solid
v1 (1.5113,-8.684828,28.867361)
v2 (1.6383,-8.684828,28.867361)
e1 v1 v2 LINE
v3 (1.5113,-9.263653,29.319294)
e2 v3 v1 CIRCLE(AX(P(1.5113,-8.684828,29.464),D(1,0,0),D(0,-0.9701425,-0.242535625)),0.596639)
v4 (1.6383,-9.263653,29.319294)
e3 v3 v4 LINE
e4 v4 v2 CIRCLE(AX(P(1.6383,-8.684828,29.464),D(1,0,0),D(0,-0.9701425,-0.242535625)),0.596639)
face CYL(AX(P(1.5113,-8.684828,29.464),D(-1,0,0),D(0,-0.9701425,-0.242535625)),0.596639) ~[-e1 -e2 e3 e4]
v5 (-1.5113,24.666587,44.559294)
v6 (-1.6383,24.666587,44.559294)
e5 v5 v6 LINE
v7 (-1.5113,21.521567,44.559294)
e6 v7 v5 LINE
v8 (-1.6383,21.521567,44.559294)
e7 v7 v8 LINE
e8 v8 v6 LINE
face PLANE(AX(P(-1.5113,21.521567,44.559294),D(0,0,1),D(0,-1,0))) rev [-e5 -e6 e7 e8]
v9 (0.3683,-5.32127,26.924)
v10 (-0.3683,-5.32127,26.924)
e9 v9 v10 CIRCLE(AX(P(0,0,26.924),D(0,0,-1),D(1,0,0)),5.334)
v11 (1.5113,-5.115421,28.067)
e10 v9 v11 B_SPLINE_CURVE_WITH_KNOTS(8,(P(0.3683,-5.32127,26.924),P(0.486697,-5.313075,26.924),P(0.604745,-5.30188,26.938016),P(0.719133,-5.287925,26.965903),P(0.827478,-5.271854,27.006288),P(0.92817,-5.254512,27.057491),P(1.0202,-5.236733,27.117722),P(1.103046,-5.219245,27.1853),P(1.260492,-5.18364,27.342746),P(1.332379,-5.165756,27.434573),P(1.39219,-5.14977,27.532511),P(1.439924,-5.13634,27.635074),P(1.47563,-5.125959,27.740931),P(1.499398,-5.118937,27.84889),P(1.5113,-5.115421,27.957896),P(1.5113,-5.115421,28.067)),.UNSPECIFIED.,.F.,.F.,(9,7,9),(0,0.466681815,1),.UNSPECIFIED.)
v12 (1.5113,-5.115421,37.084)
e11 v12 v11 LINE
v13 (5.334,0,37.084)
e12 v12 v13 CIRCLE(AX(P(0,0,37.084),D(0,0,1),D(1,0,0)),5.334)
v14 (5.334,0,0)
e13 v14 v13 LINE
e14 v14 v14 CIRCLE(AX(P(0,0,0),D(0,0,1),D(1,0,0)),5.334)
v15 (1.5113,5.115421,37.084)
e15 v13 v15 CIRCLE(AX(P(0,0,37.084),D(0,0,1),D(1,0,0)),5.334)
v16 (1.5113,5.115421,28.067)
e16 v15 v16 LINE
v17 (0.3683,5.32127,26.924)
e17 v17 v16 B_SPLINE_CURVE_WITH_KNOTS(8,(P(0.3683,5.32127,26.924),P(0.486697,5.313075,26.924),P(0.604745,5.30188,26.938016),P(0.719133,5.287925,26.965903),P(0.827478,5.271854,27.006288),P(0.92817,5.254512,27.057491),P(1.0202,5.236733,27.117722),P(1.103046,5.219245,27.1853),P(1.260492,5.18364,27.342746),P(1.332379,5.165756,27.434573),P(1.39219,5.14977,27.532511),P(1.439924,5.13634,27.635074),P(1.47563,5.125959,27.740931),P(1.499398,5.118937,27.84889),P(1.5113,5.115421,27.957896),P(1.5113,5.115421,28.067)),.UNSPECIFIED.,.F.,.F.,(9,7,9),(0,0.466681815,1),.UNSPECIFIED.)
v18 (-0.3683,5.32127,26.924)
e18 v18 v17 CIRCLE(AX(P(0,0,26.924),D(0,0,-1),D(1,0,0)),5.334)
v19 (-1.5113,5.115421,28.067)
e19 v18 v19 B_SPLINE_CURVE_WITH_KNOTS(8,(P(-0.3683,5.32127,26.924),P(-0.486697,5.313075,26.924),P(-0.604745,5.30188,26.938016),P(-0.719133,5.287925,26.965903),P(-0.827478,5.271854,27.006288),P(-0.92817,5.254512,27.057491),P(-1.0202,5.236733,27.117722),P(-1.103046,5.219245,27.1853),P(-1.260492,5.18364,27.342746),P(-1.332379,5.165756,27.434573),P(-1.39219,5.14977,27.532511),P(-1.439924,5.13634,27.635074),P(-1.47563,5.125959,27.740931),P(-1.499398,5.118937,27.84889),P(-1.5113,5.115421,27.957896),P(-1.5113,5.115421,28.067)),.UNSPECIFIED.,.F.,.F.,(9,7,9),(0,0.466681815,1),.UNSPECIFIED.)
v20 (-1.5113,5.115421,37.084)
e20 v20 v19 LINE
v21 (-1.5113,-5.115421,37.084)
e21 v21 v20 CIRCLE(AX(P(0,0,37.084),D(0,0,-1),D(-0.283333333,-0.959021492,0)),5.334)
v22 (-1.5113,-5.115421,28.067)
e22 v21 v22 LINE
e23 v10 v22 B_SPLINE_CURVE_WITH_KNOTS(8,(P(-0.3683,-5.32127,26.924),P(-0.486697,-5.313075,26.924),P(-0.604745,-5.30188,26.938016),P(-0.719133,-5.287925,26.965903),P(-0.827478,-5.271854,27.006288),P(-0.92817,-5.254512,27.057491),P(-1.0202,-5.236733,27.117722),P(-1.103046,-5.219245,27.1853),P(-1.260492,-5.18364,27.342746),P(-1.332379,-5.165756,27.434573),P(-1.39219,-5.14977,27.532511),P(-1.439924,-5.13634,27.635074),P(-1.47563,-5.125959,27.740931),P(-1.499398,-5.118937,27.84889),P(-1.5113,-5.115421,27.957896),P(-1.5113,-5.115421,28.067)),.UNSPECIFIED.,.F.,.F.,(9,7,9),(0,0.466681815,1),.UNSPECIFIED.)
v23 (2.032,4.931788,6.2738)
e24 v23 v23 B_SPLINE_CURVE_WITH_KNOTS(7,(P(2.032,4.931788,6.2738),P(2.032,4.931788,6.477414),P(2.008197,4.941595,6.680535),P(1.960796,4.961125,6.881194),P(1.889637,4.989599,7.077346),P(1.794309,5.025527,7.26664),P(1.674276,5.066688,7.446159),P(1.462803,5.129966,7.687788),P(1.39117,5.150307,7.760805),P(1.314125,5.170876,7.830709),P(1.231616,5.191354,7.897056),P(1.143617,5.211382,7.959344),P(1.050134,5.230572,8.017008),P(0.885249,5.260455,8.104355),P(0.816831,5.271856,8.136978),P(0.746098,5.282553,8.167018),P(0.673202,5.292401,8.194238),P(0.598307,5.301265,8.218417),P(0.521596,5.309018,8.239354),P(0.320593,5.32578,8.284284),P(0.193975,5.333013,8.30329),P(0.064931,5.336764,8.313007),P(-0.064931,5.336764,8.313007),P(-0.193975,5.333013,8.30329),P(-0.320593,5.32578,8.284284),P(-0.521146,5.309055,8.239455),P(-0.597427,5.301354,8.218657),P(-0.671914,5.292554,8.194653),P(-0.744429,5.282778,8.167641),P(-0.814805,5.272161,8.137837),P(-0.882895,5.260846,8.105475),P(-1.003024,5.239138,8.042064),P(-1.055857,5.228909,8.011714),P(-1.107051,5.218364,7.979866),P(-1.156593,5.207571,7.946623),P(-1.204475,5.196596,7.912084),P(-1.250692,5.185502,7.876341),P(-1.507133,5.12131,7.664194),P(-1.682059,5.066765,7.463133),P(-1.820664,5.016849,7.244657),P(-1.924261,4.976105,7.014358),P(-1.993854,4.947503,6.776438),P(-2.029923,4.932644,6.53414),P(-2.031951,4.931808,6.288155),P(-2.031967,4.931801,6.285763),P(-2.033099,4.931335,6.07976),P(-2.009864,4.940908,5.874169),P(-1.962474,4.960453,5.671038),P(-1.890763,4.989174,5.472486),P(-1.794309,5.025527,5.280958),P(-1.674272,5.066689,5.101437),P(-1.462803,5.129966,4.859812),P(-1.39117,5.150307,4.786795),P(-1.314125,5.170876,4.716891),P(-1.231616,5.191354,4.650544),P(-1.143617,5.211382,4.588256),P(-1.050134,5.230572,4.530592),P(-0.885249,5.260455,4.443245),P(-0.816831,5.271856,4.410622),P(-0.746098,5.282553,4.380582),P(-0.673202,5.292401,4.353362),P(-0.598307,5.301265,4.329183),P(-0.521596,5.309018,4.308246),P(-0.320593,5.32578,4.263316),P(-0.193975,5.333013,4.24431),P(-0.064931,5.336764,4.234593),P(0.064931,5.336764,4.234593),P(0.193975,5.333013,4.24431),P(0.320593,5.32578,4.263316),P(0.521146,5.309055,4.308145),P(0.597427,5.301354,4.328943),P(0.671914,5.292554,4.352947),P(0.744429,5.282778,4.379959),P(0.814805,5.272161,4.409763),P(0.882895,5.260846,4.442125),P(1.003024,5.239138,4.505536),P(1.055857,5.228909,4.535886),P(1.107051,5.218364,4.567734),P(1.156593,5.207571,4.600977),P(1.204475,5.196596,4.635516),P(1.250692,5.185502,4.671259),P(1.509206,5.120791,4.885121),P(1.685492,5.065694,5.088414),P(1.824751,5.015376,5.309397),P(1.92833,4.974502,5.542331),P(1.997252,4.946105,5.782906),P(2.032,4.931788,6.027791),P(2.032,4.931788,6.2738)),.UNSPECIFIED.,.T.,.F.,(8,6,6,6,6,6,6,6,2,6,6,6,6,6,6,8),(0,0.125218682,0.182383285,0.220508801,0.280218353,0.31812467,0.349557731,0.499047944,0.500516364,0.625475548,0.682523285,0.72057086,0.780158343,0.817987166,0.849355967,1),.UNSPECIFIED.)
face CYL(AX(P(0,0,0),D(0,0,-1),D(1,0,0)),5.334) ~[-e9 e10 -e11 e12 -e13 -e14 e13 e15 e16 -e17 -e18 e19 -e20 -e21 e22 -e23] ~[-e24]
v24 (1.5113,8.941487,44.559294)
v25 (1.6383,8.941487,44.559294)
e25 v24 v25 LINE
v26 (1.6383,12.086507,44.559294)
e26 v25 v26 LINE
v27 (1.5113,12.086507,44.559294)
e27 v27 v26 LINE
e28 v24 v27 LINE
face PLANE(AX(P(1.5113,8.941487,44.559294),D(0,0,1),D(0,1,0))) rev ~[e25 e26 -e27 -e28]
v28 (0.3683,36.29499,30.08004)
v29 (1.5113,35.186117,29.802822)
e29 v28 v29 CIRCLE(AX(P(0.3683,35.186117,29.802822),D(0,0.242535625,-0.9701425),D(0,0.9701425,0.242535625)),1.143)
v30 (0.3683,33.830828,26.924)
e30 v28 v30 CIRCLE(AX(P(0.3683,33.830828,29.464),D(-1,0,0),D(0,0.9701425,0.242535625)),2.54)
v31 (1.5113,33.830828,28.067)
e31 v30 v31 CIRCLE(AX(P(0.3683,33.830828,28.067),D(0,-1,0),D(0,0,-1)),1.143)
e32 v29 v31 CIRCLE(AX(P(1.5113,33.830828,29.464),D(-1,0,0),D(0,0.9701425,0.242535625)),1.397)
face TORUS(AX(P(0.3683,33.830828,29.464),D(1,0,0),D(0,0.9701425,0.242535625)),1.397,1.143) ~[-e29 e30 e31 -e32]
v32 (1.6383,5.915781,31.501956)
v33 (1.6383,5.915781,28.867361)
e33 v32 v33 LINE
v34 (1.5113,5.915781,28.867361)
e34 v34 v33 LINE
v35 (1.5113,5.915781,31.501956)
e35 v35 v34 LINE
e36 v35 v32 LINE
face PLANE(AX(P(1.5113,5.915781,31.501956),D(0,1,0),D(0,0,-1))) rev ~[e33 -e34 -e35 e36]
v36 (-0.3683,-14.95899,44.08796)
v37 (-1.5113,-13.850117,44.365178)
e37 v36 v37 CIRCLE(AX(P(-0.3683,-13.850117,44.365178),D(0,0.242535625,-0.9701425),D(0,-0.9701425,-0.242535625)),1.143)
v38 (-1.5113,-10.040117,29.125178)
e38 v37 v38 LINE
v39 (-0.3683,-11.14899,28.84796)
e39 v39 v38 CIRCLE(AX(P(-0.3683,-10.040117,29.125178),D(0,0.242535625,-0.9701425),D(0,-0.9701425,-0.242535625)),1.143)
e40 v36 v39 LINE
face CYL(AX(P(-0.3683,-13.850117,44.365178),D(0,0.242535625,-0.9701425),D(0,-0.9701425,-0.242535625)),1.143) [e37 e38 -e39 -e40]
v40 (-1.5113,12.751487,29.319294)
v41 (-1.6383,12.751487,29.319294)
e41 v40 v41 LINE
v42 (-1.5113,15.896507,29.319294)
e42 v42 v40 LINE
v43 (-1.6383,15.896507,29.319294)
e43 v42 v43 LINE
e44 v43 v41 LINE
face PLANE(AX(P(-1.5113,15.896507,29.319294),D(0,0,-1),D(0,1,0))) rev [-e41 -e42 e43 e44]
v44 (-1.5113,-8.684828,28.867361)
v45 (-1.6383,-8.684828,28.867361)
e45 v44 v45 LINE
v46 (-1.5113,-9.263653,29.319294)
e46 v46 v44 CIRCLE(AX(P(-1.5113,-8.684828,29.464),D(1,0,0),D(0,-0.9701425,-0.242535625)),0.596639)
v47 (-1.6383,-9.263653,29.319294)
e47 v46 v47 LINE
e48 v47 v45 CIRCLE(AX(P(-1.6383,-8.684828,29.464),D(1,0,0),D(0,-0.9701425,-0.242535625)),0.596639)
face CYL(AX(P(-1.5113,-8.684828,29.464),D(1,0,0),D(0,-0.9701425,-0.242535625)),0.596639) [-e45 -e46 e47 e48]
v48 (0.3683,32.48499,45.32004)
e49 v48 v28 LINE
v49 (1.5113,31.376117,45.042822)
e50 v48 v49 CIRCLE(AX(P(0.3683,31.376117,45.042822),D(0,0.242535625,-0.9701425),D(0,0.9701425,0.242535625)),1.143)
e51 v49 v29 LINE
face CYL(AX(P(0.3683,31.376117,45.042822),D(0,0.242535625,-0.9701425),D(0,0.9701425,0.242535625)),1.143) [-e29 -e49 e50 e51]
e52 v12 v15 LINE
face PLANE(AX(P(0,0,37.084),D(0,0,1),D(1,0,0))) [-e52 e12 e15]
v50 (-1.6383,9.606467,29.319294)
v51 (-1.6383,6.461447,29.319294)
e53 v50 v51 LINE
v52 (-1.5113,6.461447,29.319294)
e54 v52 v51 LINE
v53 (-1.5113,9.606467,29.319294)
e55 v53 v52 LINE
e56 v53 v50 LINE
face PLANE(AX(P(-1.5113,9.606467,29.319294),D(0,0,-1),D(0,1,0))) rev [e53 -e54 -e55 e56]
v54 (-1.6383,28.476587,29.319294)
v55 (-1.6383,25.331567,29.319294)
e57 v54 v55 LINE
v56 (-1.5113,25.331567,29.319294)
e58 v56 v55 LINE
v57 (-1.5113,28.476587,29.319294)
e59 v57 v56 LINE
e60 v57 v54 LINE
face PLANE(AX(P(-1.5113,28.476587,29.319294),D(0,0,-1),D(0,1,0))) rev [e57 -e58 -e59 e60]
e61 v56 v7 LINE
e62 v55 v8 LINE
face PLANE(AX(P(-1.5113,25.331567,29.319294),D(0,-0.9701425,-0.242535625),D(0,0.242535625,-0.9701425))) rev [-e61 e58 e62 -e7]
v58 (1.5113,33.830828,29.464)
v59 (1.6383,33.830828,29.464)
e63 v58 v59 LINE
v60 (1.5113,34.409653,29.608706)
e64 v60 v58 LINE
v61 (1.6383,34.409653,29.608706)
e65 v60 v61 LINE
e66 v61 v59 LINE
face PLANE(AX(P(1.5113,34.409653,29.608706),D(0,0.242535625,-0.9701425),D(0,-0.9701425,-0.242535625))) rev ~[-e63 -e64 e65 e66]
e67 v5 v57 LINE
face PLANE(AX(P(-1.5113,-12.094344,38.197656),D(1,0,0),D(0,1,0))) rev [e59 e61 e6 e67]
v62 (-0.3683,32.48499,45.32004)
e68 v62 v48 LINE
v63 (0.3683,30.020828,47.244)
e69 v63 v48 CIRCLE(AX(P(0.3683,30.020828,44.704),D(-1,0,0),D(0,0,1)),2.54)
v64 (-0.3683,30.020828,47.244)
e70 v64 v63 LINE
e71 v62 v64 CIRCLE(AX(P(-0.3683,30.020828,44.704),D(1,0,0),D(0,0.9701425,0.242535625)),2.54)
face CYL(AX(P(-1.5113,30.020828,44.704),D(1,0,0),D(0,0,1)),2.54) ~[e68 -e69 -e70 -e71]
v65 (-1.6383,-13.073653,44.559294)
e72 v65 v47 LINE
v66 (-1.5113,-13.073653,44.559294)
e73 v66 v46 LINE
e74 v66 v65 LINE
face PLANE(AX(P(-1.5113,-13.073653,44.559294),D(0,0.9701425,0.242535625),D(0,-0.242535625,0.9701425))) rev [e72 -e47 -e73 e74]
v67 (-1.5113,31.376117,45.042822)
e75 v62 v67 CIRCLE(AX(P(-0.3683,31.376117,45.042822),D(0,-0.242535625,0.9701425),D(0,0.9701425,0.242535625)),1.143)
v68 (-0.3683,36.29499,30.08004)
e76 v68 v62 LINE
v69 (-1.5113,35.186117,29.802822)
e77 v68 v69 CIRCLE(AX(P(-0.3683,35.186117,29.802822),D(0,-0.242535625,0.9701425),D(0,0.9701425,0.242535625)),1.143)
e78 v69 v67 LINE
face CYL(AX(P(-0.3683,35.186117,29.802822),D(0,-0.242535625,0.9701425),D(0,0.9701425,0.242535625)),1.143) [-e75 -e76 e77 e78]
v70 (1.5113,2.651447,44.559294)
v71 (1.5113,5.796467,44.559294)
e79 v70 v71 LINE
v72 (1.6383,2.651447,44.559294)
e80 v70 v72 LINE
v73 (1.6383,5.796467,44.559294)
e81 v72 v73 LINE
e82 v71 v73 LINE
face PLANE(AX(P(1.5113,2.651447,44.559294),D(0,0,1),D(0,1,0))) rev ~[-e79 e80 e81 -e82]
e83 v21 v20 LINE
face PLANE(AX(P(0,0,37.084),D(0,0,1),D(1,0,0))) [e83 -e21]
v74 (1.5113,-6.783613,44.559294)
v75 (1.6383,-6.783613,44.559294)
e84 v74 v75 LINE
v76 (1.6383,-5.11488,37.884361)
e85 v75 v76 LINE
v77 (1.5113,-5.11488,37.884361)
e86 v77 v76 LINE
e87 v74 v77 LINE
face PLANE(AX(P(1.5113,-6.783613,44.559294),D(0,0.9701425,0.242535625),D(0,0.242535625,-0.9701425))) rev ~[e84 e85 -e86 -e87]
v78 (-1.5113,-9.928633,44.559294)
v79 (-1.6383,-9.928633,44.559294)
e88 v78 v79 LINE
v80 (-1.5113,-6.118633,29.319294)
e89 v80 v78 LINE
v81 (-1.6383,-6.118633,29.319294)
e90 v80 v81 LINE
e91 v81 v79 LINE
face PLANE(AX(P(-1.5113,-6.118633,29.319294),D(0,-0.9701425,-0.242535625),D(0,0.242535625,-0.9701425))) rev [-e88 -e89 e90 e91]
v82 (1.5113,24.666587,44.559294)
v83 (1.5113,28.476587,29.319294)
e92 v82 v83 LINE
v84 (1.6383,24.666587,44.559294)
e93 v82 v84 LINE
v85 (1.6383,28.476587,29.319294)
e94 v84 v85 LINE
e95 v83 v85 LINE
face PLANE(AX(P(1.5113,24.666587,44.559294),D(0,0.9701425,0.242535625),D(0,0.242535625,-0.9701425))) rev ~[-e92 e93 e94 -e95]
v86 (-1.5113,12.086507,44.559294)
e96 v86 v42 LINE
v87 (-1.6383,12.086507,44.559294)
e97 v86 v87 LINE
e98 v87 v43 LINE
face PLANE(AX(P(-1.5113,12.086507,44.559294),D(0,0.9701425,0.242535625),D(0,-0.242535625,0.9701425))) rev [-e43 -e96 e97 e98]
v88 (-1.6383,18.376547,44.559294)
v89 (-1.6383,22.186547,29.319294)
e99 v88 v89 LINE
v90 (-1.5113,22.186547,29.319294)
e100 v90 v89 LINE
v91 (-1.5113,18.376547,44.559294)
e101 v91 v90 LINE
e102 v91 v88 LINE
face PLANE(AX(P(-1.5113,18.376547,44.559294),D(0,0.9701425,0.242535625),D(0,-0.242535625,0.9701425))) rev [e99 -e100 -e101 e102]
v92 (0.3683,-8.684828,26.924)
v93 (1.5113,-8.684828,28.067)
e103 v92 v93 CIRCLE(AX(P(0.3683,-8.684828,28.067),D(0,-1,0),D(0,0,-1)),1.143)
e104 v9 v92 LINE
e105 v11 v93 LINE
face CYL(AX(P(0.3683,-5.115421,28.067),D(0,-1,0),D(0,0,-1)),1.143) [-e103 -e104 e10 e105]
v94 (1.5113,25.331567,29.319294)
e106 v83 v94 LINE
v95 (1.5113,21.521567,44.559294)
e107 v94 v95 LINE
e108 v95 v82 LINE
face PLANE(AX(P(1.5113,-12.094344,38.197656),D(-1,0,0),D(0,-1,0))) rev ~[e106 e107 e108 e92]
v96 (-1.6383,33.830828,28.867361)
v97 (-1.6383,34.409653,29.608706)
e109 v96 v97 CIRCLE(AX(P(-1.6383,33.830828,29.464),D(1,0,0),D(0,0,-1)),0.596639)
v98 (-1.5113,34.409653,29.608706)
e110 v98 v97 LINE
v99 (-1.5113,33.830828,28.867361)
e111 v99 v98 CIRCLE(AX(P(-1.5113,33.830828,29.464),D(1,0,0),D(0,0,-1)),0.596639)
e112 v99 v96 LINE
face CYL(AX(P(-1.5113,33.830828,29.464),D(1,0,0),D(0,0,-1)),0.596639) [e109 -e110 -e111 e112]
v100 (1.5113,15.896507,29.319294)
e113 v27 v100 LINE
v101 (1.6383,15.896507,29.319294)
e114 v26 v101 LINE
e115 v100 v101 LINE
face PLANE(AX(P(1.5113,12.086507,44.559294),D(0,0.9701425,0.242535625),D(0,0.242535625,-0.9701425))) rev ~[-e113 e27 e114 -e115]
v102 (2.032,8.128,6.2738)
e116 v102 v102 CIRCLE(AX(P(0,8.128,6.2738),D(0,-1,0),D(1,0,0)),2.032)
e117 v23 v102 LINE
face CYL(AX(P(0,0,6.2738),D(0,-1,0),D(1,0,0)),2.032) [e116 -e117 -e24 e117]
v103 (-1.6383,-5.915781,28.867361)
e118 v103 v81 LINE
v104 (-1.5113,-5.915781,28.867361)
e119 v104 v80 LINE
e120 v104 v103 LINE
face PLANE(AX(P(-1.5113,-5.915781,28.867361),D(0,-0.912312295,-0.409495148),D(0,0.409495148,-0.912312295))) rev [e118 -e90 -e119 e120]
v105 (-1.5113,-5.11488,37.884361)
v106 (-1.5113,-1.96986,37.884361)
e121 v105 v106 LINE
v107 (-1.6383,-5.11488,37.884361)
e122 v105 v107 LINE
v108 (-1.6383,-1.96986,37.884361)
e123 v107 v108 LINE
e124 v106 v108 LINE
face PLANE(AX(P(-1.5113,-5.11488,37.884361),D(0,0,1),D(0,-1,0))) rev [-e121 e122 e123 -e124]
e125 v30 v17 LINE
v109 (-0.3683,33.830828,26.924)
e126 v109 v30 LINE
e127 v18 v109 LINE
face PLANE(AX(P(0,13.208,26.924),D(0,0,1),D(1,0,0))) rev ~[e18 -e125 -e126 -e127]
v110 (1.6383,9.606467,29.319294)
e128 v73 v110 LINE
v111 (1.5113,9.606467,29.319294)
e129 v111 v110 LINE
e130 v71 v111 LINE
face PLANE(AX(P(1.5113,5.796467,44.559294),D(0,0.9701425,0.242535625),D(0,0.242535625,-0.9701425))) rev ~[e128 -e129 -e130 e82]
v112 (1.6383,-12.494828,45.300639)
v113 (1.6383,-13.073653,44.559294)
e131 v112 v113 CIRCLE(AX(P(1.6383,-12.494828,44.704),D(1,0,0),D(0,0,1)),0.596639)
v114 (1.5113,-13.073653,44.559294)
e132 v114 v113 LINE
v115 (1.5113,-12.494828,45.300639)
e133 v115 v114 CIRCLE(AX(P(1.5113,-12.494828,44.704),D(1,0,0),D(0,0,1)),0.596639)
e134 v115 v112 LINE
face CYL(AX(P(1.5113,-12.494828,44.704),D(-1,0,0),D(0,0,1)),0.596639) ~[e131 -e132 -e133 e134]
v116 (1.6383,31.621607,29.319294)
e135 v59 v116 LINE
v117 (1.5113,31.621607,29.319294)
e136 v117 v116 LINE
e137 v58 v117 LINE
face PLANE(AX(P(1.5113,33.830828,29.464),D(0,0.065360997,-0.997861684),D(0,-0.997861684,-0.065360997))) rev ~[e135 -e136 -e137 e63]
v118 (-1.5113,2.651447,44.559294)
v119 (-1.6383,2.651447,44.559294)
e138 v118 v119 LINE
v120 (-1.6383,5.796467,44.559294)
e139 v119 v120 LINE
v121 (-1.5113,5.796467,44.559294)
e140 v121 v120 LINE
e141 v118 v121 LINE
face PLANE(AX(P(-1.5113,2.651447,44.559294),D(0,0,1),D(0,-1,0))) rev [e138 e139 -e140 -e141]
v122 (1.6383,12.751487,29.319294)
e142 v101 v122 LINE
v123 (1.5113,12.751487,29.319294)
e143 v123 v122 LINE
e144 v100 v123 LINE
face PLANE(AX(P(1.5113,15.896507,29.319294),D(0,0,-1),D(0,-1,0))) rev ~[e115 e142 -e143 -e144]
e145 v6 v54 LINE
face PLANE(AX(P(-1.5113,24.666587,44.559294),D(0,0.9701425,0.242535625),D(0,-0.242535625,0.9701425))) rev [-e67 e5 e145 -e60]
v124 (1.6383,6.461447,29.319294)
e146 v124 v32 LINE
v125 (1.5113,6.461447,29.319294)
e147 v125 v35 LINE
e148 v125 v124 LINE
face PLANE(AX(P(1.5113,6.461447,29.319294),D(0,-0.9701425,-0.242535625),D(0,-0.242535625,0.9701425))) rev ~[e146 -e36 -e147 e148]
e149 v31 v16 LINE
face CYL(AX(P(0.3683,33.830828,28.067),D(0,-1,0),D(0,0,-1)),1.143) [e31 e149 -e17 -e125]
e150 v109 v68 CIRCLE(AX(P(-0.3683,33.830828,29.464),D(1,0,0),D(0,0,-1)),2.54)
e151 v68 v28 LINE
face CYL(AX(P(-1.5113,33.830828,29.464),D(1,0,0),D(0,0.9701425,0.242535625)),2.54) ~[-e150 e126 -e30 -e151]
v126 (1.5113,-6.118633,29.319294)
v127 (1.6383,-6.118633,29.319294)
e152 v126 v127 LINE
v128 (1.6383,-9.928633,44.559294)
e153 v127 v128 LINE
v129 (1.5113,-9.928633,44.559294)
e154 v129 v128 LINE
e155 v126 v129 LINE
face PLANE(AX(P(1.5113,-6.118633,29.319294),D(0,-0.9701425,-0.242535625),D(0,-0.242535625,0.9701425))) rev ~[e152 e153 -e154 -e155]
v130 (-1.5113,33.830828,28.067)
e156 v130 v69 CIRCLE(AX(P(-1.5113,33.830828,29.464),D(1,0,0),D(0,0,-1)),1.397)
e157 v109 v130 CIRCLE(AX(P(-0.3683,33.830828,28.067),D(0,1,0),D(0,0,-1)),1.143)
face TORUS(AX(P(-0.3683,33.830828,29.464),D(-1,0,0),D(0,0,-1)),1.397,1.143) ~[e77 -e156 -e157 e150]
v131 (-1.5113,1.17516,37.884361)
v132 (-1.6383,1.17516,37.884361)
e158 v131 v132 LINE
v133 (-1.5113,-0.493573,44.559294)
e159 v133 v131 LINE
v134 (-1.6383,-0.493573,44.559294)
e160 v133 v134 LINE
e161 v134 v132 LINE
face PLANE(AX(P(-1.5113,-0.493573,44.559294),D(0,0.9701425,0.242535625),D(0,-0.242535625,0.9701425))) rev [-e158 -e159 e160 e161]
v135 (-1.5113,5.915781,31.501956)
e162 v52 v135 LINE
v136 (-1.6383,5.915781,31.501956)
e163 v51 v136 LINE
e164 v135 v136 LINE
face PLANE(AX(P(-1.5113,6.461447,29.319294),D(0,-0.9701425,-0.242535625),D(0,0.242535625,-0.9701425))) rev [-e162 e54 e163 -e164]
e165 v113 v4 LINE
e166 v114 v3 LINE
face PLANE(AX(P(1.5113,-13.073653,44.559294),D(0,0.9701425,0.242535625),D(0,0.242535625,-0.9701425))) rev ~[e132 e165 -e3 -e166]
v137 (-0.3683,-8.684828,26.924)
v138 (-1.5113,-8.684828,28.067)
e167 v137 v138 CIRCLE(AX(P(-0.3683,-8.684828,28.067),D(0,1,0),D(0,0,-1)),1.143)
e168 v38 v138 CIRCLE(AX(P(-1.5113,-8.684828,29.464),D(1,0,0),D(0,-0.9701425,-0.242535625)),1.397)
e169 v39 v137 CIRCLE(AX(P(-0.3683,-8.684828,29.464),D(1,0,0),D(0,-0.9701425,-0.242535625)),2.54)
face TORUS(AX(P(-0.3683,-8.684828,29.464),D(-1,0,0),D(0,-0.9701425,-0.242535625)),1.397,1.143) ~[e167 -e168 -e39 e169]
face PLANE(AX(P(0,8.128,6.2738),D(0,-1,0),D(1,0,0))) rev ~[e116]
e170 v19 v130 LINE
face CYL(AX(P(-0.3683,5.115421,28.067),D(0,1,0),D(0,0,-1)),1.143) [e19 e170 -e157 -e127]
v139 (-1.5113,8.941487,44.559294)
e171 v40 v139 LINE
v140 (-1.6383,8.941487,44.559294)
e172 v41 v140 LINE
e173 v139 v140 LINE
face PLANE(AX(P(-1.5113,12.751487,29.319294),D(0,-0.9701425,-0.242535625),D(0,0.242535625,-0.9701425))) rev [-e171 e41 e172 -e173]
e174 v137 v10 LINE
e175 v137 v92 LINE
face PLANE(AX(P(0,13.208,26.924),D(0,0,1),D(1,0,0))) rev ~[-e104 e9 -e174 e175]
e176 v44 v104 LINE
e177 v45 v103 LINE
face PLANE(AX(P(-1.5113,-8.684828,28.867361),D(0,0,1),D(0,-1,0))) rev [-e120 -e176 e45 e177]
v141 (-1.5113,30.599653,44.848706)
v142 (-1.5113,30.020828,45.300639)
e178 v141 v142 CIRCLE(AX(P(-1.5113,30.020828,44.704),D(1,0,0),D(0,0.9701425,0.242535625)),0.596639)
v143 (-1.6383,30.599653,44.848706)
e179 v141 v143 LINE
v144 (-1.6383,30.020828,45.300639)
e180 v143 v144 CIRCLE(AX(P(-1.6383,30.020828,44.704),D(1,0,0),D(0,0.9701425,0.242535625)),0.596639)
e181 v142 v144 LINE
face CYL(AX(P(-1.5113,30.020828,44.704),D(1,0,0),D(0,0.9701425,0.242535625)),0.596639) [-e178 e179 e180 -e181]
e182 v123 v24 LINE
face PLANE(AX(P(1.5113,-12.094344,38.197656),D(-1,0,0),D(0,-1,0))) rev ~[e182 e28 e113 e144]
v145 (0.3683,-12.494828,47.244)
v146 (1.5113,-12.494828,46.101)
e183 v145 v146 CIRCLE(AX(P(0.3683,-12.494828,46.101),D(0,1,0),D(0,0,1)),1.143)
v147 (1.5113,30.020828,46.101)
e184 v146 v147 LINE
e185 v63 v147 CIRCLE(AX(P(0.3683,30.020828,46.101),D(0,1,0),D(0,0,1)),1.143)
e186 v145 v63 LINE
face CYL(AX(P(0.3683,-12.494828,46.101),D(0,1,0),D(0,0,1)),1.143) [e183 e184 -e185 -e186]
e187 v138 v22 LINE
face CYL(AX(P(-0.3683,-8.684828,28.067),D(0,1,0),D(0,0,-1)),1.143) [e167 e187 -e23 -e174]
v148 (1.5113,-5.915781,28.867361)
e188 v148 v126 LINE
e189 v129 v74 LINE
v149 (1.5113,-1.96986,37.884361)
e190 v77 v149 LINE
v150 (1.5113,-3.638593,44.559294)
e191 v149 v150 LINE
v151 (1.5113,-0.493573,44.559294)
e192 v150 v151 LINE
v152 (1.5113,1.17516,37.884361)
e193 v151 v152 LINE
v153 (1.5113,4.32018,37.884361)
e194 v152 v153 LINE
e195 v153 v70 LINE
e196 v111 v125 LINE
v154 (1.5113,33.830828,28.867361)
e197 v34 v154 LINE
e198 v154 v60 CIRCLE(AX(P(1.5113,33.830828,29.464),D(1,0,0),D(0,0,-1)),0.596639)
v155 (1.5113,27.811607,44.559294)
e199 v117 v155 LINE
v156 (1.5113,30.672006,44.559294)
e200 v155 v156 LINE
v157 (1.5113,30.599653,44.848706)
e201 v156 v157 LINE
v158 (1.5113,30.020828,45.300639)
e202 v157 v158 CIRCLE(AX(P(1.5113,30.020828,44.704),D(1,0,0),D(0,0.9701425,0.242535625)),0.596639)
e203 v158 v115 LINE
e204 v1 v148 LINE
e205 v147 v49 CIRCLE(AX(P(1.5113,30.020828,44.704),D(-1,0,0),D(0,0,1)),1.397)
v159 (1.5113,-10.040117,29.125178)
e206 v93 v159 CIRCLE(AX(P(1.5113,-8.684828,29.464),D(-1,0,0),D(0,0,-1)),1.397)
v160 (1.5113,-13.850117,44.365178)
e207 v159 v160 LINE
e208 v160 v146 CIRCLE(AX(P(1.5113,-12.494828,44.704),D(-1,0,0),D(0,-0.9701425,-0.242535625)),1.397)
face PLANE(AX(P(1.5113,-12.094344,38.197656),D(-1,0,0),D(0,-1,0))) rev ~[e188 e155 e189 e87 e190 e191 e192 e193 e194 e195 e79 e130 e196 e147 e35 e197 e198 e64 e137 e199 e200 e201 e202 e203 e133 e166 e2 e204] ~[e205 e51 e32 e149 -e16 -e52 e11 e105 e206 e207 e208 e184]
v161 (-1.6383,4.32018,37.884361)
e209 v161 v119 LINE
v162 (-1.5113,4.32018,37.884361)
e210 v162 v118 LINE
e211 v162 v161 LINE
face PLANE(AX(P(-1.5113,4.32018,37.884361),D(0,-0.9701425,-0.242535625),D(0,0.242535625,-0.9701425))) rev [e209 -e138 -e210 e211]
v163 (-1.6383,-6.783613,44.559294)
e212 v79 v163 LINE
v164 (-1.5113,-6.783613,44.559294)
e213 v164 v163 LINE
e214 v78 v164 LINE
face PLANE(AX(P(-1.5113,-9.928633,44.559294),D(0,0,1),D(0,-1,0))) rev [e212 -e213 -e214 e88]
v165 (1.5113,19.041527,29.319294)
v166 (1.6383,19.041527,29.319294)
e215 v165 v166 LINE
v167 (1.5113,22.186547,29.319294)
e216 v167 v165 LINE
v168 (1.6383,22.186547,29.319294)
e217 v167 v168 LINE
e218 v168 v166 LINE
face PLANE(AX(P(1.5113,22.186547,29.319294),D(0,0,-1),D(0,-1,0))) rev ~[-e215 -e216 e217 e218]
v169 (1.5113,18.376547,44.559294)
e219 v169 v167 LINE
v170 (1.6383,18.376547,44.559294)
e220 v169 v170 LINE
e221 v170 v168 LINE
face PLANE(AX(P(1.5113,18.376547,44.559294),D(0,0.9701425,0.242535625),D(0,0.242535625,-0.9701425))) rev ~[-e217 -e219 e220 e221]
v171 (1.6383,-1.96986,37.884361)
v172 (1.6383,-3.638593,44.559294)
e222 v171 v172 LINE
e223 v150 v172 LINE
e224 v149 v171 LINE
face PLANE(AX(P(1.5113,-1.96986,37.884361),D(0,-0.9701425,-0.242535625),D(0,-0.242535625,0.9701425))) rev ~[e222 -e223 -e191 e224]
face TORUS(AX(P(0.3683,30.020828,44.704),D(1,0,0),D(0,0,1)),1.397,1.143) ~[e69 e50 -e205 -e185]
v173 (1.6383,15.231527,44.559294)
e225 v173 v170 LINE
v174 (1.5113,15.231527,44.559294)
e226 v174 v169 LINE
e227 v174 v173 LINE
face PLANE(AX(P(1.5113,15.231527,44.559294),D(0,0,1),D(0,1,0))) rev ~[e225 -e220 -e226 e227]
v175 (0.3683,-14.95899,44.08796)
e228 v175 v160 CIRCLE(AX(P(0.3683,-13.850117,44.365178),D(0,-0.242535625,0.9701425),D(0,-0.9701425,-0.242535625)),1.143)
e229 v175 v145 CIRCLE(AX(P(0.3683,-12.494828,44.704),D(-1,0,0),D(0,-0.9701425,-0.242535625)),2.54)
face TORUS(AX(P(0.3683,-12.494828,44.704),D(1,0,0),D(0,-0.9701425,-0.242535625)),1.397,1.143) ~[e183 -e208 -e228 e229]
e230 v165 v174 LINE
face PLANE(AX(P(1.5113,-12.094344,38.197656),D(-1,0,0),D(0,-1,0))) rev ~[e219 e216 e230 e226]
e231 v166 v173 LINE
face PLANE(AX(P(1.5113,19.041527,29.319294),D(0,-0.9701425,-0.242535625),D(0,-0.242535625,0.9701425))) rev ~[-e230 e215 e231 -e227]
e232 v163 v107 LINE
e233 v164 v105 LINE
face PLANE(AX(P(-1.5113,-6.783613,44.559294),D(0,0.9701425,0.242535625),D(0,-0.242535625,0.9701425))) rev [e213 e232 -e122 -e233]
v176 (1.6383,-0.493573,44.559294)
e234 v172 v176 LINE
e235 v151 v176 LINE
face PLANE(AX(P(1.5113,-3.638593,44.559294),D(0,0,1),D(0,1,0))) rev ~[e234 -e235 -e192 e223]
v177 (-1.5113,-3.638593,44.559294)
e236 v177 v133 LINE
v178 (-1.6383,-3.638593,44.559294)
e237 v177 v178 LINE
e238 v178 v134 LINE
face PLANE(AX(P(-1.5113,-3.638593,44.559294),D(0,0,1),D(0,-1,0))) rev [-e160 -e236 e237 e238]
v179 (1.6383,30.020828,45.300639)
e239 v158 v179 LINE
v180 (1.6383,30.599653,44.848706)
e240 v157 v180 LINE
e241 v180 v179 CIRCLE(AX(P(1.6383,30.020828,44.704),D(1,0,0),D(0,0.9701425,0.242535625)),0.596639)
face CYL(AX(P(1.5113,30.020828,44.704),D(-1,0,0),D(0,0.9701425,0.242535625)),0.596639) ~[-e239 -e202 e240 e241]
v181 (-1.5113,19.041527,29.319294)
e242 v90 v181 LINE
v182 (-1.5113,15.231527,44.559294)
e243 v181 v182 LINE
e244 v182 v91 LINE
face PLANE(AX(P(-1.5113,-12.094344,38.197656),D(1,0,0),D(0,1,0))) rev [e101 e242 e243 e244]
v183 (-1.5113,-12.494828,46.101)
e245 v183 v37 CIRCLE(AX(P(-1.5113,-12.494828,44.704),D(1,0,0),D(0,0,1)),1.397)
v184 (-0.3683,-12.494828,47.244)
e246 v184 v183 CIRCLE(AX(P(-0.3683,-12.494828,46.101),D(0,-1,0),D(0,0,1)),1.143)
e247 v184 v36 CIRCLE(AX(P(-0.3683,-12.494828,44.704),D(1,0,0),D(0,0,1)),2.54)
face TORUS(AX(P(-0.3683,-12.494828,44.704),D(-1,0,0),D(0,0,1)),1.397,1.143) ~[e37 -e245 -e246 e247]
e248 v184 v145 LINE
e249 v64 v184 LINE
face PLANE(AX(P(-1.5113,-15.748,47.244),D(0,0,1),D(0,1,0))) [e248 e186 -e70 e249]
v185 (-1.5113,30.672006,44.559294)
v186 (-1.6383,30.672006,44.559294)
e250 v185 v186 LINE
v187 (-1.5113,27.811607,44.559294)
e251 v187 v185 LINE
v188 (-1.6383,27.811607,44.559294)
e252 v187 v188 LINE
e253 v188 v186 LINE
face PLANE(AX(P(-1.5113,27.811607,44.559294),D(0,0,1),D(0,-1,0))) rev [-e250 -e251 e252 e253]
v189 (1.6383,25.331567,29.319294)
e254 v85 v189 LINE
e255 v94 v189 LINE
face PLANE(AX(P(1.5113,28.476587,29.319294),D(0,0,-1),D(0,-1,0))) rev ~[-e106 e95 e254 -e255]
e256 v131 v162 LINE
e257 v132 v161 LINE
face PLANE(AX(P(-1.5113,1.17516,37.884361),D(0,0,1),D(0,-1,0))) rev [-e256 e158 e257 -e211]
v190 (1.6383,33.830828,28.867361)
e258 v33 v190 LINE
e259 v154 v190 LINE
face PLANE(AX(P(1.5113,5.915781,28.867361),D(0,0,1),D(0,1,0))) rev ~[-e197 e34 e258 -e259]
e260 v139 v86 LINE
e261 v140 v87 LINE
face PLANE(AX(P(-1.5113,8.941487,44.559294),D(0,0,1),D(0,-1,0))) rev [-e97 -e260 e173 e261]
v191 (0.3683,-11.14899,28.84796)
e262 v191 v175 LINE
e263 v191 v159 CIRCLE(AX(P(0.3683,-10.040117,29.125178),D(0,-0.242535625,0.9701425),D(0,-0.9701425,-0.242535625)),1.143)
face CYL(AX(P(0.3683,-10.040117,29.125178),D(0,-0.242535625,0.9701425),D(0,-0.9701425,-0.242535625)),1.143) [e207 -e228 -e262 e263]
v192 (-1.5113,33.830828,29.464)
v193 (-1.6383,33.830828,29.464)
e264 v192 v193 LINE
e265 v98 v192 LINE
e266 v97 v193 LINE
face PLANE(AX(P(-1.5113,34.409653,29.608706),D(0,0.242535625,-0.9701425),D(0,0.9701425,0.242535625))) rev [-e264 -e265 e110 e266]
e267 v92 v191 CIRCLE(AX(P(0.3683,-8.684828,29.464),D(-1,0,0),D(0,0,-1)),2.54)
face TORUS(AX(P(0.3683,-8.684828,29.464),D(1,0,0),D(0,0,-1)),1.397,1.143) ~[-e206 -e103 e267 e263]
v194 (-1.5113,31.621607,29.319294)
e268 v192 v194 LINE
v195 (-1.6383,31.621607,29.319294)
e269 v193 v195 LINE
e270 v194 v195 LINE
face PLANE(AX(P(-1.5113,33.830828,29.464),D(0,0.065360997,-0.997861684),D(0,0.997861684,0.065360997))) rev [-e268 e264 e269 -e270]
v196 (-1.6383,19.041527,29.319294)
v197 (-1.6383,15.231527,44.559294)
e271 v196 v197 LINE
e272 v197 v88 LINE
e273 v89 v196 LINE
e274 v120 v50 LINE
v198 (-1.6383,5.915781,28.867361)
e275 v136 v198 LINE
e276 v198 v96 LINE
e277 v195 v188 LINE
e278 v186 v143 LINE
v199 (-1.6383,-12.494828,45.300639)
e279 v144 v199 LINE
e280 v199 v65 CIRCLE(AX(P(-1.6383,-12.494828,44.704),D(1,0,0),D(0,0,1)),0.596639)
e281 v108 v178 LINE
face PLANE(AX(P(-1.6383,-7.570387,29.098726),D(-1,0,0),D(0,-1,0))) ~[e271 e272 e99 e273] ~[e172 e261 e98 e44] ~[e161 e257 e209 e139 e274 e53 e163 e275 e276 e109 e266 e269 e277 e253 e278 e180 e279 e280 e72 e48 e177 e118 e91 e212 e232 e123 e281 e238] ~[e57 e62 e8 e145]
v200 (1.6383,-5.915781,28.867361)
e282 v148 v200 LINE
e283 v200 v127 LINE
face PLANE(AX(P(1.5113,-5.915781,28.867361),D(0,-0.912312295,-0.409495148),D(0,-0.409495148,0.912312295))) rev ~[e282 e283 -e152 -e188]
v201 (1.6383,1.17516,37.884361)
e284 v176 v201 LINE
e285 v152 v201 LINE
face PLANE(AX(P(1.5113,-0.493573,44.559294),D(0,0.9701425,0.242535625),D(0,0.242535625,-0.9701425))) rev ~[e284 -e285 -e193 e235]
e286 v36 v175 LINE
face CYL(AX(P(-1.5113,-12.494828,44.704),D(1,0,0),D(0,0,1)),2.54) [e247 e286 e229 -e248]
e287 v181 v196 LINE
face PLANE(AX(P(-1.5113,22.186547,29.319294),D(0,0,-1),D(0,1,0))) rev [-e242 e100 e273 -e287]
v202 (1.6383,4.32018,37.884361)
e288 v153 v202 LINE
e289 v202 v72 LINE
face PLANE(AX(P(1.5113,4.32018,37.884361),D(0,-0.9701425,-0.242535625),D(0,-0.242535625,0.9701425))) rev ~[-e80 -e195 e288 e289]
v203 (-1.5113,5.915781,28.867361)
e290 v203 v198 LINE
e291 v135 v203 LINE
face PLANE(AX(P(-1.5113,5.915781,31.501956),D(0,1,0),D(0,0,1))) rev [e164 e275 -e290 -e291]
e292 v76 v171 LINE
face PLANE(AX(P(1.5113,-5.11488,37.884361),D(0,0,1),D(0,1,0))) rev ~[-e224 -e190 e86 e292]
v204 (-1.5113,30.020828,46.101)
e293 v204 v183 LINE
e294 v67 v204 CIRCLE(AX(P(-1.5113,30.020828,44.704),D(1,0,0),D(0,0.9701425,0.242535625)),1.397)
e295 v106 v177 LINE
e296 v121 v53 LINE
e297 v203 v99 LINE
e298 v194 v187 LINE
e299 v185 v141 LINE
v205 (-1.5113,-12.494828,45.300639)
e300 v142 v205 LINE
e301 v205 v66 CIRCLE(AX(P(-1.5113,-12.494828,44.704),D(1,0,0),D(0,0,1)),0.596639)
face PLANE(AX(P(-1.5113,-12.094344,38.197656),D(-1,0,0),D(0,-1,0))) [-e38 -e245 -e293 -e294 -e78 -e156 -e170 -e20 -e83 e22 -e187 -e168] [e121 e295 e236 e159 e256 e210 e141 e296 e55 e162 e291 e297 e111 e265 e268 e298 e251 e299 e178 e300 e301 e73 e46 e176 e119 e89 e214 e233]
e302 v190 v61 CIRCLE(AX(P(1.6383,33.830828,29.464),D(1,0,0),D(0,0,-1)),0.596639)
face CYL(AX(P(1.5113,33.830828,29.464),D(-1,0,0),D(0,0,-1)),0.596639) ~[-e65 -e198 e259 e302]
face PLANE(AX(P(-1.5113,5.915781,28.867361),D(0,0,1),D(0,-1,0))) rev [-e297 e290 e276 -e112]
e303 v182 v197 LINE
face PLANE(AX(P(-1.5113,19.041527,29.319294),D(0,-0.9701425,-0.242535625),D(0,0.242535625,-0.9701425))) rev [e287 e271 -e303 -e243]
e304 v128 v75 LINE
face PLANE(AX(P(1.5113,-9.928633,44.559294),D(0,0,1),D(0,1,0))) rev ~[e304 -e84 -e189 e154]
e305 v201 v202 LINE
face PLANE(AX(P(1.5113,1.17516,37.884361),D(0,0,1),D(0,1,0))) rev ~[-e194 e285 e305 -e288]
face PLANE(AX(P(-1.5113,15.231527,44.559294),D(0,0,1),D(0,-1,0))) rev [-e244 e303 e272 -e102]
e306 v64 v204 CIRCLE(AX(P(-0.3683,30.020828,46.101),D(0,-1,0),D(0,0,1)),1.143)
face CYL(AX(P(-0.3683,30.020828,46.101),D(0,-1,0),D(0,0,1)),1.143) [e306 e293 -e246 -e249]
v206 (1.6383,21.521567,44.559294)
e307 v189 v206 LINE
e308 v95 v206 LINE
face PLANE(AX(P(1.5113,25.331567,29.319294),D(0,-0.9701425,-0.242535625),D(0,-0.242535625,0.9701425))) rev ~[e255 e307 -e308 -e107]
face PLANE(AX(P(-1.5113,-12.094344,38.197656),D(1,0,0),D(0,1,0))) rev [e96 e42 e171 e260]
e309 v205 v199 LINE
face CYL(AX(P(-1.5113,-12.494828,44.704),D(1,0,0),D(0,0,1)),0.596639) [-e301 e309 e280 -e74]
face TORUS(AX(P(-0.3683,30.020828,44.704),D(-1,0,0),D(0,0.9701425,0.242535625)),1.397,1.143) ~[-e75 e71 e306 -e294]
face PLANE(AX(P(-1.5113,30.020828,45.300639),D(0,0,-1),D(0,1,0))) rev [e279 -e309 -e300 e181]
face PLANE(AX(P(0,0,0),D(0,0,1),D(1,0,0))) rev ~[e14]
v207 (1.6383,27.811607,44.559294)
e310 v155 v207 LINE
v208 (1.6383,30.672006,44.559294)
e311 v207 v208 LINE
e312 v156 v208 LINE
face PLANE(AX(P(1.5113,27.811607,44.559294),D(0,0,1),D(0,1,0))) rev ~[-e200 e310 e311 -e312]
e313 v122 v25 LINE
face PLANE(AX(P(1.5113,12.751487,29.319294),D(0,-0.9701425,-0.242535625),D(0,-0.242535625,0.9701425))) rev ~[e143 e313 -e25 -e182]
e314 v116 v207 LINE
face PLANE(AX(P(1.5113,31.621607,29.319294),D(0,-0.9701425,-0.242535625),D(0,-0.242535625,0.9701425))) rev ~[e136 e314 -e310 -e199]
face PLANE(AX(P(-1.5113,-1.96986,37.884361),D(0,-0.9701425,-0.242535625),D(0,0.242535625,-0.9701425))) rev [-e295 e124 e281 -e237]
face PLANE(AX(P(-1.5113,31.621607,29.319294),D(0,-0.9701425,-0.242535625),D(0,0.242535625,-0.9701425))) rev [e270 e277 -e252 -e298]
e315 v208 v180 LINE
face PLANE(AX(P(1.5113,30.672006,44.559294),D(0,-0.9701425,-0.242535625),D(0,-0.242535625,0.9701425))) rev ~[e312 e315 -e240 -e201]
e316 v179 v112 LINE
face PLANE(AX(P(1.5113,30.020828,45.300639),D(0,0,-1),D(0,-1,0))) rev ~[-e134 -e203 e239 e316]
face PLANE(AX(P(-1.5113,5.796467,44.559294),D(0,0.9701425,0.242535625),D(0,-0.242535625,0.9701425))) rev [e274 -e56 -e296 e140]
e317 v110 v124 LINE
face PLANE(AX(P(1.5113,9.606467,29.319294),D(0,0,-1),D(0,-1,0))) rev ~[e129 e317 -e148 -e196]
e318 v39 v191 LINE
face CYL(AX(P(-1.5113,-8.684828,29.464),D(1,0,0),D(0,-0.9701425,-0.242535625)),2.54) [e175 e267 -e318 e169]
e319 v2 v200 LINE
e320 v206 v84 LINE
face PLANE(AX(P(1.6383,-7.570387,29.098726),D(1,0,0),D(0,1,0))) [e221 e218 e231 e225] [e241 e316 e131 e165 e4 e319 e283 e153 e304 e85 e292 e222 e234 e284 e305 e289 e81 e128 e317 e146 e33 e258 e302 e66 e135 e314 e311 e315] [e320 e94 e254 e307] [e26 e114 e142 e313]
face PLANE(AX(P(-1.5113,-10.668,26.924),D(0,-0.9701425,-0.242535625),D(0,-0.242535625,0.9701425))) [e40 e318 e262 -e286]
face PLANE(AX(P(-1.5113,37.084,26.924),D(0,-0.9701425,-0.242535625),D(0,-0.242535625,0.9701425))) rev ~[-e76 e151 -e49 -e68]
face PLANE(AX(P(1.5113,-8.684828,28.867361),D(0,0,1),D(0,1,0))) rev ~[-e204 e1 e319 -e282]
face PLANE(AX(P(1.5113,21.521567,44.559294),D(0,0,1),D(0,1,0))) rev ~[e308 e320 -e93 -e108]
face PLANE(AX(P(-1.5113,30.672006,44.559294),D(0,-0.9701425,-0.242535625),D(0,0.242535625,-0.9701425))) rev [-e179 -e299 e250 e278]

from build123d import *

# Parameters (mm, degrees)
F0_R      = 5.334
F1_DEPTH  = 37.084
F2_R      = 2.032
F3_DEPTH  = 8.128
F4_W      = 3.0226
F4_H      = 47.752
F5_DEPTH  = 10.16
F7_DEPTH  = 3.0226
F9_DEPTH  = 3.0226
F10_R     = 2.54
F11_R     = 1.143
F13_DEPTH = 0.127


# Not quite as in the source:
# - a feature of the source that left no trace in its solid (it failed there, or was rolled back) is left out


with BuildPart() as f1:
    # F0 (on Top) → F1 (new body)
    with BuildSketch(Plane.XY):
        Circle(F0_R)
    extrude(amount=F1_DEPTH)

    # F2 (on Front) → F3 (join)
    with BuildSketch(Plane.XZ):
        with Locations((0, 6.2738)):
            Circle(F2_R)
    extrude(amount=-F3_DEPTH)

    # F4 (on face) → F5 (join, symmetric)
    with BuildSketch(Plane.XY.offset(37.084)):
        with Locations((0, 13.208)):
            Rectangle(F4_W, F4_H)
    extrude(amount=F5_DEPTH, both=True)

    # F6 (on face) → F7 (join)
    with BuildSketch(Plane(origin=(-1.5113, 0, 0), x_dir=(0, -1, 0), z_dir=(-1, 0, 0))):
        Polygon((15.748, 47.244), (10.668, 47.244), (10.668, 26.924), align=None)
        Polygon((-37.084, 47.244), (-37.084, 26.924), (-32.004, 47.244), align=None)
    extrude(amount=-F7_DEPTH)

    # F8 (on face) → F9 (cut, through all)
    with BuildSketch(Plane(origin=(-1.5113, 0, 0), x_dir=(0, -1, 0), z_dir=(-1, 0, 0))):
        Polygon((-37.084, 47.244), (-37.084, 26.924), (-32.004, 47.244), align=None)
    extrude(amount=-F9_DEPTH, mode=Mode.SUBTRACT)

    # F10
    f10_edges = [f1.edges().sort_by_distance(p)[0] for p in [
        (0, 32.004, 47.244),
        (0, 37.084, 26.924),
        (0, -15.748, 47.244),
        (0, -10.668, 26.924),
    ]]
    fillet(f10_edges, radius=F10_R)

    # F11
    f11_edges = [f1.edges().sort_by_distance(p)[0] for p in [
        (-1.5113, 8.763, 47.244),
        (1.5113, 8.763, 47.244),
        (-1.5113, 34.38999, 37.70004),
        (1.5113, 34.38999, 37.70004),
        (1.5113, 31.583975, 46.706042),
        (-1.5113, 31.583975, 46.706042),
        (-1.5113, 35.83287, 27.900853),
        (1.5113, 35.83287, 27.900853),
        (1.5113, 19.473124, 26.924),
        (-1.5113, 19.473124, 26.924),
        (1.5113, -14.49687, 46.267147),
        (1.5113, -13.05399, 36.46796),
        (-1.5113, -14.49687, 46.267147),
        (-1.5113, -13.05399, 36.46796),
        (1.5113, -10.247975, 27.461958),
        (1.5113, -6.900124, 26.924),
        (-1.5113, -6.900124, 26.924),
        (-1.5113, -10.247975, 27.461958),
    ]]
    fillet(f11_edges, radius=F11_R)

    # F12 (on face) → F13 (join)
    with BuildSketch(Plane.YZ.offset(1.5113)):
        with BuildLine():
            Line((-6.1186332318, 29.319293674), (-9.2636532318, 29.319293674))
            ThreePointArc((-9.2636532318, 29.319293674), (-9.0520071402, 28.9937255277), (-8.6848279277, 28.8673605332))
            Line((-8.6848279277, 28.8673605332), (-5.9157811718, 28.8673605332))
            Line((-5.9157811718, 28.8673605332), (-6.1186332318, 29.319293674))
        make_face()
        Polygon((-9.9286332318, 44.559293674), (-13.0736532318, 44.559293674), (-9.2636532318, 29.319293674), (-6.1186332318, 29.319293674), align=None)
        Polygon((-3.6385932318, 44.559293674), (-6.7836132318, 44.559293674), (-5.1148799466, 37.8843605332), (-1.9698599466, 37.8843605332), align=None)
        Polygon((2.6514467682, 44.559293674), (-0.4935732318, 44.559293674), (1.1751600534, 37.8843605332), (4.3201800534, 37.8843605332), align=None)
        with BuildLine():
            ThreePointArc((33.8308279277, 28.8673605332), (34.3011024, 29.0968207875), (34.4096532318, 29.608706326))
            Line((34.4096532318, 29.608706326), (33.8308279277, 29.464))
            Line((33.8308279277, 29.464), (31.6216067682, 29.319293674))
            Line((31.6216067682, 29.319293674), (28.4765867682, 29.319293674))
            Line((28.4765867682, 29.319293674), (25.3315667682, 29.319293674))
            Line((25.3315667682, 29.319293674), (22.1865467682, 29.319293674))
            Line((22.1865467682, 29.319293674), (19.0415267682, 29.319293674))
            Line((19.0415267682, 29.319293674), (15.8965067682, 29.319293674))
            Line((15.8965067682, 29.319293674), (12.7514867682, 29.319293674))
            Line((12.7514867682, 29.319293674), (9.6064667682, 29.319293674))
            Line((9.6064667682, 29.319293674), (6.4614467682, 29.319293674))
            Line((6.4614467682, 29.319293674), (5.9157811718, 31.5019560598))
            Line((5.9157811718, 31.5019560598), (5.9157811718, 28.8673605332))
            Line((5.9157811718, 28.8673605332), (33.8308279277, 28.8673605332))
        make_face()
        with BuildLine():
            ThreePointArc((-12.4948279277, 45.3006394668), (-12.9651024, 45.0711792125), (-13.0736532318, 44.559293674))
            Line((-13.0736532318, 44.559293674), (-9.9286332318, 44.559293674))
            Line((-9.9286332318, 44.559293674), (-6.7836132318, 44.559293674))
            Line((-6.7836132318, 44.559293674), (-3.6385932318, 44.559293674))
            Line((-3.6385932318, 44.559293674), (-0.4935732318, 44.559293674))
            Line((-0.4935732318, 44.559293674), (2.6514467682, 44.559293674))
            Line((2.6514467682, 44.559293674), (5.7964667682, 44.559293674))
            Line((5.7964667682, 44.559293674), (8.9414867682, 44.559293674))
            Line((8.9414867682, 44.559293674), (12.0865067682, 44.559293674))
            Line((12.0865067682, 44.559293674), (15.2315267682, 44.559293674))
            Line((15.2315267682, 44.559293674), (18.3765467682, 44.559293674))
            Line((18.3765467682, 44.559293674), (21.5215667682, 44.559293674))
            Line((21.5215667682, 44.559293674), (24.6665867682, 44.559293674))
            Line((24.6665867682, 44.559293674), (27.8116067682, 44.559293674))
            Line((27.8116067682, 44.559293674), (30.6720063948, 44.559293674))
            Line((30.6720063948, 44.559293674), (30.5996532318, 44.848706326))
            ThreePointArc((30.5996532318, 44.848706326), (30.3880071402, 45.1742744723), (30.0208279277, 45.3006394668))
            Line((30.0208279277, 45.3006394668), (-12.4948279277, 45.3006394668))
        make_face()
        Polygon((8.9414867682, 44.559293674), (5.7964667682, 44.559293674), (9.6064667682, 29.319293674), (12.7514867682, 29.319293674), align=None)
        Polygon((15.2315267682, 44.559293674), (12.0865067682, 44.559293674), (15.8965067682, 29.319293674), (19.0415267682, 29.319293674), align=None)
        Polygon((25.3315667682, 29.319293674), (21.5215667682, 44.559293674), (18.3765467682, 44.559293674), (22.1865467682, 29.319293674), align=None)
        Polygon((31.6216067682, 29.319293674), (27.8116067682, 44.559293674), (24.6665867682, 44.559293674), (28.4765867682, 29.319293674), align=None)
    extrude(amount=F13_DEPTH)

    # F14: F1 across plane


with BuildPart() as f1_1:
    add(f1.part)
    add(f1.part.mirror(Plane.YZ))

    # F17: F1 across plane


with BuildPart() as f1_2:
    add(f1_1.part)
    add(f1_1.part.mirror(Plane.YZ))


solid = f1_2.part
